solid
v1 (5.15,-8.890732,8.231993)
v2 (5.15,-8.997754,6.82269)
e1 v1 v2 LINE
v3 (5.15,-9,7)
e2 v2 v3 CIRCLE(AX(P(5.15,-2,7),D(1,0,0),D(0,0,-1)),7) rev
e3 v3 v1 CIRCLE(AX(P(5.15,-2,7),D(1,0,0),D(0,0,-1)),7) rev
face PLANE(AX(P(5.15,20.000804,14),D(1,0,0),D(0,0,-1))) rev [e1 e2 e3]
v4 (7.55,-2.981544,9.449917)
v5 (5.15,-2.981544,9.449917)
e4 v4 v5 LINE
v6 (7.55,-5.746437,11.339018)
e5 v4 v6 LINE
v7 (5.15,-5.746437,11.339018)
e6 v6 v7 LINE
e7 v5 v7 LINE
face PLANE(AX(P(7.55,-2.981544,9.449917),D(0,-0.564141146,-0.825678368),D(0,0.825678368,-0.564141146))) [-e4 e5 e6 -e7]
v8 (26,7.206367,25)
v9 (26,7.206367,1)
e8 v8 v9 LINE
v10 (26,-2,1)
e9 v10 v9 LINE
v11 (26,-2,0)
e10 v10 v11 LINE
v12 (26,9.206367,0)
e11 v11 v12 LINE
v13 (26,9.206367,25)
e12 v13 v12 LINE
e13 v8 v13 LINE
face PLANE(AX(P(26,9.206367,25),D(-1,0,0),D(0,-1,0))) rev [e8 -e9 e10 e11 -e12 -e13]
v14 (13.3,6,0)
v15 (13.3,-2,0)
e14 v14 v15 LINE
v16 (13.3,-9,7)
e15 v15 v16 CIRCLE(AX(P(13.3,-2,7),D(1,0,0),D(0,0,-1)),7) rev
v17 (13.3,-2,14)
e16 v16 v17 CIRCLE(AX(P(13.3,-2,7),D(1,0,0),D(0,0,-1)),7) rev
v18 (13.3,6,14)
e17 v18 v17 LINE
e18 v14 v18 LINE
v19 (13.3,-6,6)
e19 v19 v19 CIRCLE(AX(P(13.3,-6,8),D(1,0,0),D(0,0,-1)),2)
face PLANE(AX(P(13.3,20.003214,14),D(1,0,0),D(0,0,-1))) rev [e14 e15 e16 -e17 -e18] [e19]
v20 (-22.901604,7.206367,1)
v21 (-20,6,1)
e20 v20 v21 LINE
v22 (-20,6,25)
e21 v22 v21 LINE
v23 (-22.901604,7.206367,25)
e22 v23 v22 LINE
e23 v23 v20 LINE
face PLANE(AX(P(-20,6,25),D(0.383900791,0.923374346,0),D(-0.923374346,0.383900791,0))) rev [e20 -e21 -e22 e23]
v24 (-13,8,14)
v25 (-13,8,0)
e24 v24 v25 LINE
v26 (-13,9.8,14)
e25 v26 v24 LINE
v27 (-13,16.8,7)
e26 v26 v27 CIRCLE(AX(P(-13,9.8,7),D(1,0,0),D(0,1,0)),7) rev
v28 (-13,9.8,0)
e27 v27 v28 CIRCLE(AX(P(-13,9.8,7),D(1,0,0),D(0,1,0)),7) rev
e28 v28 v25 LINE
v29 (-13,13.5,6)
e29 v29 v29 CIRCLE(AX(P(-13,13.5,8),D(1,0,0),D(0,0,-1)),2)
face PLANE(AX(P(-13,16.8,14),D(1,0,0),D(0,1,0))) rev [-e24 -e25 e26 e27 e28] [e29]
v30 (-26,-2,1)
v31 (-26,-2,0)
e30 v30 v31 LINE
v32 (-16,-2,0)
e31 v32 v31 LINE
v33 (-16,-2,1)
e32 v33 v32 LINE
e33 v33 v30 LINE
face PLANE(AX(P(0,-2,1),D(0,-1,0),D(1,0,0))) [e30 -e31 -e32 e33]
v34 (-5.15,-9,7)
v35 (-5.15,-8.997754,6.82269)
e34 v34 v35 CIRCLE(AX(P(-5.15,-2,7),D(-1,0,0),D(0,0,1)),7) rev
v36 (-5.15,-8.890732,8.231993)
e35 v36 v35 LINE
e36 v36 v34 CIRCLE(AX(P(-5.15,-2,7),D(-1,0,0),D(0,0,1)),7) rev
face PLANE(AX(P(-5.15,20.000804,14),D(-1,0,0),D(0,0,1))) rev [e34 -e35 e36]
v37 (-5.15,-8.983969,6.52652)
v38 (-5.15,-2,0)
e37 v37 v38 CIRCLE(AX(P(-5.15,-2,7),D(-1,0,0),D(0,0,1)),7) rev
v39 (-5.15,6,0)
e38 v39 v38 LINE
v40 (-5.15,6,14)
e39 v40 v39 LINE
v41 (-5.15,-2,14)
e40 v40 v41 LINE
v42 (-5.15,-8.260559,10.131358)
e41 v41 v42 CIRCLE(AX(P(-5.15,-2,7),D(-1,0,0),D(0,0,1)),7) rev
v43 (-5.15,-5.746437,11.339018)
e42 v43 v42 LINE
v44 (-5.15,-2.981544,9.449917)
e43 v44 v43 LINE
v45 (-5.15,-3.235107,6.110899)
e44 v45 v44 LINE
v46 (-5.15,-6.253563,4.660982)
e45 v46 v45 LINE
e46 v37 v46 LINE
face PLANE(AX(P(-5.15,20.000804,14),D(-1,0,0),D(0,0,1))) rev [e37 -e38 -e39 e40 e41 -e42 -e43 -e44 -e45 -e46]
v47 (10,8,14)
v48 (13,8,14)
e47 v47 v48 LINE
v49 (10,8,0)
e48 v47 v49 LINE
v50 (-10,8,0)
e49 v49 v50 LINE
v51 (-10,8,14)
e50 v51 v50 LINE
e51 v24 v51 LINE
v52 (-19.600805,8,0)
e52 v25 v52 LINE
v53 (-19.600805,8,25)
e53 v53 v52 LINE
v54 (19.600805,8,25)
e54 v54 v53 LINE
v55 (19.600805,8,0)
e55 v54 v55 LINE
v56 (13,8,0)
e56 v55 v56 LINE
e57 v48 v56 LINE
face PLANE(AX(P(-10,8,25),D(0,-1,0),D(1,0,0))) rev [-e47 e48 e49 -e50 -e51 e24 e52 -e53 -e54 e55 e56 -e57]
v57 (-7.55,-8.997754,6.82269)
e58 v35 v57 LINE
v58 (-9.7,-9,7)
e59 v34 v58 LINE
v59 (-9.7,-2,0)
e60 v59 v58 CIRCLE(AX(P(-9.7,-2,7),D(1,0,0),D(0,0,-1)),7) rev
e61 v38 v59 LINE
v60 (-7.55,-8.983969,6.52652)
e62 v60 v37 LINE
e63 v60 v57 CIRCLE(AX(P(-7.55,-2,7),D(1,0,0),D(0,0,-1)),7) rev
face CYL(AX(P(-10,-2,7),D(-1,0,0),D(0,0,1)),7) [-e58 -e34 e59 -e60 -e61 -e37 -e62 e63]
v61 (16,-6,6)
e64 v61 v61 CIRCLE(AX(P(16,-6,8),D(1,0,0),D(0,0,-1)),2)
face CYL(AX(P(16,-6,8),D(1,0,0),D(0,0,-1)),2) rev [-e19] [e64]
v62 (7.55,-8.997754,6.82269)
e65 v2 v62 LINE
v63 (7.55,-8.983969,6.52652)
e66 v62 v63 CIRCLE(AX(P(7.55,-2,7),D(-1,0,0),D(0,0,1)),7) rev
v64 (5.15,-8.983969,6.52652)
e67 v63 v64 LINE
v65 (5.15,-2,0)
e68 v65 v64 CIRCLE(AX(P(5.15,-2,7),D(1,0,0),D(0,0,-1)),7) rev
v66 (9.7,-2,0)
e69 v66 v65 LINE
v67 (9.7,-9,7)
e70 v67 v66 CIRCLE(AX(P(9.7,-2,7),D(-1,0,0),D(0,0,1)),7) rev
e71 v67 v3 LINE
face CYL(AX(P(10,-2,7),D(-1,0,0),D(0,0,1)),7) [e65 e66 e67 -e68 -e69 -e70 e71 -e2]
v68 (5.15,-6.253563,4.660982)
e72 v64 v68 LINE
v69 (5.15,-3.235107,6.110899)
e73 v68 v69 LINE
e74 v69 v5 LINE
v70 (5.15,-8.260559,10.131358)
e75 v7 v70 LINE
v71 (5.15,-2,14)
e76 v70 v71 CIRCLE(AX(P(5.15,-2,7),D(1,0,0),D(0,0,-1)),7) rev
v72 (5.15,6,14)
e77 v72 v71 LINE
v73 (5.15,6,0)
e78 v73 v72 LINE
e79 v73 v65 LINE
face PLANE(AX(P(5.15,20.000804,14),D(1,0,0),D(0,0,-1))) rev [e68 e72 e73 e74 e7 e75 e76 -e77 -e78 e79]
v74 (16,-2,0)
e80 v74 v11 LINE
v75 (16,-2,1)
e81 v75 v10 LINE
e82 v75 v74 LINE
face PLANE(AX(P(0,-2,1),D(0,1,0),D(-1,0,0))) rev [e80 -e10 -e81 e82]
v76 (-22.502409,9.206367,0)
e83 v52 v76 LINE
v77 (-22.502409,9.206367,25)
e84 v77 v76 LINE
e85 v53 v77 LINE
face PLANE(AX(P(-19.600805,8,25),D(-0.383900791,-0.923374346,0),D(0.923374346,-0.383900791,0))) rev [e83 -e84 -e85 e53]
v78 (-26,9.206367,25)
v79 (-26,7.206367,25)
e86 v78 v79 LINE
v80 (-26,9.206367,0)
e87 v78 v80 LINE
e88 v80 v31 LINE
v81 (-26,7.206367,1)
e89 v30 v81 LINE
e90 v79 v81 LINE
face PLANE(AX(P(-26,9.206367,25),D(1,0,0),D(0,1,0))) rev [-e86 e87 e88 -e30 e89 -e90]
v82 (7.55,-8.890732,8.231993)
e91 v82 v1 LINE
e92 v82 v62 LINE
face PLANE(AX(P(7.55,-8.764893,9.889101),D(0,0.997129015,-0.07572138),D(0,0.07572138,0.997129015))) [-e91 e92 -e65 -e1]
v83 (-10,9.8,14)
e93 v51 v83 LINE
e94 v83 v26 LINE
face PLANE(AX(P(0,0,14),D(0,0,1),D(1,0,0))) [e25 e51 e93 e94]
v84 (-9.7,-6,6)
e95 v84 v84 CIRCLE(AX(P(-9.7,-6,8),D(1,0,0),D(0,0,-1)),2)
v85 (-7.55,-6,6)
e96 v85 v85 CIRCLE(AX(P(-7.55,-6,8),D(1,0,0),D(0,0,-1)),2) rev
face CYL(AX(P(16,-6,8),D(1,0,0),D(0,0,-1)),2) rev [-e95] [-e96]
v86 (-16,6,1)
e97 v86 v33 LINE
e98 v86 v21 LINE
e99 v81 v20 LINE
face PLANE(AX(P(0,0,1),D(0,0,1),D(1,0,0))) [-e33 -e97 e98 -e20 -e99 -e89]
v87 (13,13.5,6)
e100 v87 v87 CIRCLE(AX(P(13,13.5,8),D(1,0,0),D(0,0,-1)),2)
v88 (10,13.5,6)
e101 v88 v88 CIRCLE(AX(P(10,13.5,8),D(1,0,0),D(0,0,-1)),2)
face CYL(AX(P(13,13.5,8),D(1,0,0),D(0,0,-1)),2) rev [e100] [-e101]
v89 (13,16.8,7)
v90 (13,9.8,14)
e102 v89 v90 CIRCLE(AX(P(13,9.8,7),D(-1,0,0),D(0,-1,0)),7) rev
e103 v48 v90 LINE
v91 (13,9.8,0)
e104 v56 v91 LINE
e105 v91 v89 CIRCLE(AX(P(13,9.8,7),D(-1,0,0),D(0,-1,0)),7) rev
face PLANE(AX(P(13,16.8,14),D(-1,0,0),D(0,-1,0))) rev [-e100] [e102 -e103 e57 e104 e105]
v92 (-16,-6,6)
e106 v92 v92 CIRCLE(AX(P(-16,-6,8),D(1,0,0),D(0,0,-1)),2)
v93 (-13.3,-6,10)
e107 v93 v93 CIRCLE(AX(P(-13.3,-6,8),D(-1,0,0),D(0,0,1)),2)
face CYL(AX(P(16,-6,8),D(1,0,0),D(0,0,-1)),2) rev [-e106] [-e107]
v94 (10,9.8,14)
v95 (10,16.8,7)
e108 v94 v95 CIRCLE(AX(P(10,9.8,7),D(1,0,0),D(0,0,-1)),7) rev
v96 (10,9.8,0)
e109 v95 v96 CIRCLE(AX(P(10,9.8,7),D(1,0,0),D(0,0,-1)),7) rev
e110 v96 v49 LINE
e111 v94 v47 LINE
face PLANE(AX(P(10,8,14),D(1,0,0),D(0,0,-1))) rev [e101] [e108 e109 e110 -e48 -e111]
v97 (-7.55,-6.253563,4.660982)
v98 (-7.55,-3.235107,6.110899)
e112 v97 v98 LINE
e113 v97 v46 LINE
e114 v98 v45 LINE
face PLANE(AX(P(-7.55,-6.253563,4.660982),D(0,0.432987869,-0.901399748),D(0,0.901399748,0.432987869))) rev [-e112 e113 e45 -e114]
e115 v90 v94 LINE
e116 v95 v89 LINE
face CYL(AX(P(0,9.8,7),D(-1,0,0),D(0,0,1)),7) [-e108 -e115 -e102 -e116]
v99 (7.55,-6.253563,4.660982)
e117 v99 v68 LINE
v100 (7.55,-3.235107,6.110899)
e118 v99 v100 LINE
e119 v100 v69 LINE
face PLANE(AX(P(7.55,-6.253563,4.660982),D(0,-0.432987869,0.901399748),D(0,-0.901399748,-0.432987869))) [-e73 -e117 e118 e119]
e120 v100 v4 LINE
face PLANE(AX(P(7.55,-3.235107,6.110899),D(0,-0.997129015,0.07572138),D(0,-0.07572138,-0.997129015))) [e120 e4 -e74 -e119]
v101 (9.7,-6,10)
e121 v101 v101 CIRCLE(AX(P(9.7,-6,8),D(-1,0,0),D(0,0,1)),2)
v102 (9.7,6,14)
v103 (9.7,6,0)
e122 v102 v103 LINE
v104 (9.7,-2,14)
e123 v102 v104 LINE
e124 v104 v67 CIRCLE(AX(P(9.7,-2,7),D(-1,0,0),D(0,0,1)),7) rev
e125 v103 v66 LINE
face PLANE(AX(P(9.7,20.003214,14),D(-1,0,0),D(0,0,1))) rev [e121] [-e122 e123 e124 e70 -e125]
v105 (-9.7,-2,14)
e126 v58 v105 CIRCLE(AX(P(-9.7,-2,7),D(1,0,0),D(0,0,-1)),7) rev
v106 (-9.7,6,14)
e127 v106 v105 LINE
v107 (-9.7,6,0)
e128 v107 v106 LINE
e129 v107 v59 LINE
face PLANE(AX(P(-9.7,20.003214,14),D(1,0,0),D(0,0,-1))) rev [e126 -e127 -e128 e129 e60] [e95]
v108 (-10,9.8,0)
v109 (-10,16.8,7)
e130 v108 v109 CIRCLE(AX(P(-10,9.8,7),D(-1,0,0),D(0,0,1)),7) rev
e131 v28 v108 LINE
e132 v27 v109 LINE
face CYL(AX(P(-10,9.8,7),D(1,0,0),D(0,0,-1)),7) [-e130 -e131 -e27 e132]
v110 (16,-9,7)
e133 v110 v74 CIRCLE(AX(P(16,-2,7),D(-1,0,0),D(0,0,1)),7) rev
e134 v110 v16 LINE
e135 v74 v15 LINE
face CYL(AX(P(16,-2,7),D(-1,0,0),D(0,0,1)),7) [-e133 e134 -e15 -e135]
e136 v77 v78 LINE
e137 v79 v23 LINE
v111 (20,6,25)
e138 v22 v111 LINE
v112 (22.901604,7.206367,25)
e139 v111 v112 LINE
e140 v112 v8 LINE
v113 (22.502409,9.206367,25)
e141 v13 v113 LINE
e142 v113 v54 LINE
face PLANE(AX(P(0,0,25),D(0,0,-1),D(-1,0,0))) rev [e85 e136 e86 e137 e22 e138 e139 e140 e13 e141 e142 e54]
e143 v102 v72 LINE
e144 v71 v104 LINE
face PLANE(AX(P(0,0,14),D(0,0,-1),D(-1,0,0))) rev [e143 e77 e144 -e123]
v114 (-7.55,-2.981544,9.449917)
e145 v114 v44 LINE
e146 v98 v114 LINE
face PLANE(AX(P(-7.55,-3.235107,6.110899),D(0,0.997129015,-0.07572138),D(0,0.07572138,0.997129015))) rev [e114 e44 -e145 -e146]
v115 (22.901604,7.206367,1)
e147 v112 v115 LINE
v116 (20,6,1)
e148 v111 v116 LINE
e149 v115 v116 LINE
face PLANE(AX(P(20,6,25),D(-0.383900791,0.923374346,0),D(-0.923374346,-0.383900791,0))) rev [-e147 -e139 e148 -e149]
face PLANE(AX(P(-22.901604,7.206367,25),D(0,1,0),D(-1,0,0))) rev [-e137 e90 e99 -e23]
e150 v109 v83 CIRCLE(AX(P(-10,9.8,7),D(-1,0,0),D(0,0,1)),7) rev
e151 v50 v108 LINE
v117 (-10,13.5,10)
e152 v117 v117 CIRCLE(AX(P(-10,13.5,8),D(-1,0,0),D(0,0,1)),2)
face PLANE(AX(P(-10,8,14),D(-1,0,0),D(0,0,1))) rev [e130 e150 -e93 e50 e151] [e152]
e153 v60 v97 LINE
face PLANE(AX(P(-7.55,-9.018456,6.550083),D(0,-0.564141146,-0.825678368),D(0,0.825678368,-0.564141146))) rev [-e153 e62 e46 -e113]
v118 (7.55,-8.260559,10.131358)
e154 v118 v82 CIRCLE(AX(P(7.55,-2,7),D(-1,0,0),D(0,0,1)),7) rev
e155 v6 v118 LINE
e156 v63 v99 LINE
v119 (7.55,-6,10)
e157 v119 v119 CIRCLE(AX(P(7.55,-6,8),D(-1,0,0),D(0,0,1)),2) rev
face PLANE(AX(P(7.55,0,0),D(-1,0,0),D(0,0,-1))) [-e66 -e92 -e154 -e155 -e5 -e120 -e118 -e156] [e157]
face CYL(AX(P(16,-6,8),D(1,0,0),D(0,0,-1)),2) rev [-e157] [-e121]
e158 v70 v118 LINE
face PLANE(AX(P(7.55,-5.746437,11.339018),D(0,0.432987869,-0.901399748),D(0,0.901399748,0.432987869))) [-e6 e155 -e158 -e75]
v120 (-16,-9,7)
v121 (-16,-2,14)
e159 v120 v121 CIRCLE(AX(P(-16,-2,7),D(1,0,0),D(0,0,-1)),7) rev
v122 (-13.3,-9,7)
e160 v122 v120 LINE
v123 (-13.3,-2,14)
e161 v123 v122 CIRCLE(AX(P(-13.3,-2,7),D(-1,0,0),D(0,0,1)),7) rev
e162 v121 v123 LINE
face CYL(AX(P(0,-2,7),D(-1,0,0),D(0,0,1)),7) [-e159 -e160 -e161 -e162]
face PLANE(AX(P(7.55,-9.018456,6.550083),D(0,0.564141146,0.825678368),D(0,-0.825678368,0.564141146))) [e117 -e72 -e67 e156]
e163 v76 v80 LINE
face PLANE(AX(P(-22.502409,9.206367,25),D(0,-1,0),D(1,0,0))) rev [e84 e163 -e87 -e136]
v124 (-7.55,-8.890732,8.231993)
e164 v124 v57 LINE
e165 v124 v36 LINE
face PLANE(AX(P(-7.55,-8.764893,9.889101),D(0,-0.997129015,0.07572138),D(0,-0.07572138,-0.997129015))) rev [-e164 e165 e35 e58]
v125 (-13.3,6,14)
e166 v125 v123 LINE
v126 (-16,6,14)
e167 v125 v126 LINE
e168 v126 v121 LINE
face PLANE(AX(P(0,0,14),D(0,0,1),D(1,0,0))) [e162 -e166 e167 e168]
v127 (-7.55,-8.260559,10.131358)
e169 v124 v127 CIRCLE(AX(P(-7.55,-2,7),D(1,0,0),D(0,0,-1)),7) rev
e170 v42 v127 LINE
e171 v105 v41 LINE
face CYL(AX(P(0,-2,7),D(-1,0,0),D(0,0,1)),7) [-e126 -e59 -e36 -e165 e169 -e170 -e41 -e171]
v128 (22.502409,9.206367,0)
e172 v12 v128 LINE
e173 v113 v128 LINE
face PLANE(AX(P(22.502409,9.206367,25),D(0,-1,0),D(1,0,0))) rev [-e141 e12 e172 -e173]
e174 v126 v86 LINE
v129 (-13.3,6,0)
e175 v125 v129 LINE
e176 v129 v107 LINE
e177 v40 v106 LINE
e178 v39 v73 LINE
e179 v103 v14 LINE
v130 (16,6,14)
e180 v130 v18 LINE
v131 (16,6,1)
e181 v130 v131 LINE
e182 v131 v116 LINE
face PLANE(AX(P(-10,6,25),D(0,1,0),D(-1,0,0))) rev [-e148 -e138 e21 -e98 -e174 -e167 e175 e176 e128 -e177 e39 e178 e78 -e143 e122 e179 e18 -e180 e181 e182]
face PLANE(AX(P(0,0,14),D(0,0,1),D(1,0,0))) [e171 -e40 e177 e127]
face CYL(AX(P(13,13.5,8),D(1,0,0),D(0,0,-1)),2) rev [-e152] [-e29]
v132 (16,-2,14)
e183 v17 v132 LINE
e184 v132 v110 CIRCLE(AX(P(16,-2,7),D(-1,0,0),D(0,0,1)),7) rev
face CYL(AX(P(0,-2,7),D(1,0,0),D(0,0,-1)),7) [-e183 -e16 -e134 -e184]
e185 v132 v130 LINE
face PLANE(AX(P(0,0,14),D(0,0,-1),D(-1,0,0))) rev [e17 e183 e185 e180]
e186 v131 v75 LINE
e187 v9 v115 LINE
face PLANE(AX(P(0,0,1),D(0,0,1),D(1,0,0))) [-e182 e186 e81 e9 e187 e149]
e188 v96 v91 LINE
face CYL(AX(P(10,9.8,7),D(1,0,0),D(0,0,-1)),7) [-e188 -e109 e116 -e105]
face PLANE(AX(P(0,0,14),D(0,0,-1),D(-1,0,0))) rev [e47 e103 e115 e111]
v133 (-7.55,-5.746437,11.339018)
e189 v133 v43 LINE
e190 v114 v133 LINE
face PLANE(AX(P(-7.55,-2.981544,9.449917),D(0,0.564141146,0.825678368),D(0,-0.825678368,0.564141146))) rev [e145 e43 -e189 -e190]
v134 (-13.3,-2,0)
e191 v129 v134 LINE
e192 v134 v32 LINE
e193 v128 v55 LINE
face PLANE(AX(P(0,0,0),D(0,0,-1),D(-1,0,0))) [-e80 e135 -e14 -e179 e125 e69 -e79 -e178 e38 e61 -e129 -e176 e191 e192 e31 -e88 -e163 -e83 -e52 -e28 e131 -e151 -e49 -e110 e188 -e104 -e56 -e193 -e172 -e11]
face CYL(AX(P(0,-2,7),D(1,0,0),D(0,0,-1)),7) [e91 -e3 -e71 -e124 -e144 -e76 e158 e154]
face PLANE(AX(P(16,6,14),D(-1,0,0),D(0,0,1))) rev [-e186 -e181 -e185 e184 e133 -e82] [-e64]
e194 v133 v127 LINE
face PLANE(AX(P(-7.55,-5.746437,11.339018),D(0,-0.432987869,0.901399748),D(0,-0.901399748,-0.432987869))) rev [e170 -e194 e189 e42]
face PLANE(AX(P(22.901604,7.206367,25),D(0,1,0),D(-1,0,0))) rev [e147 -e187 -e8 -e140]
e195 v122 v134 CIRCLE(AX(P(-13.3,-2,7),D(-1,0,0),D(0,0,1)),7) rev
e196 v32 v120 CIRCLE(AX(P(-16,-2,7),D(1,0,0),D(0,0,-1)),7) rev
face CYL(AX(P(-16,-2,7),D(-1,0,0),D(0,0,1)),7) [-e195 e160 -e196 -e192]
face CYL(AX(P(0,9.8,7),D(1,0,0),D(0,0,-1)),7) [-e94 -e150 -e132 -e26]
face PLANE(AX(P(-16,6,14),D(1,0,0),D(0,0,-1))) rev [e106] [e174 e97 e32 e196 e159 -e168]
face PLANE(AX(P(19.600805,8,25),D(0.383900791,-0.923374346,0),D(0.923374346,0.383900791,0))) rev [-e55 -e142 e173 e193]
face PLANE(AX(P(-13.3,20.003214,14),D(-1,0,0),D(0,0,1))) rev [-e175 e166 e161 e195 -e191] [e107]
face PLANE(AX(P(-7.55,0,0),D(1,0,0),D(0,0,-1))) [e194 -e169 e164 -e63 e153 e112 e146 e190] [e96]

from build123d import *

# Parameters (mm, degrees)
SKETCH2_W                 = 5
SKETCH2_H                 = 15
BOSS_EXTRUDE1_DEPTH       = 14
BOSS_EXTRUDE1_2_DEPTH     = 14
BOSS_EXTRUDE3_DEPTH       = 25
SKETCH5_W                 = 3
SKETCH5_H                 = 8.8
BOSS_EXTRUDE4_DEPTH       = 14
SKETCH7_W                 = 3
SKETCH7_H                 = 15
BOSS_EXTRUDE5_DEPTH       = 14
SKETCH15_W                = 0.3
SKETCH15_H                = 14
CUT_EXTRUDE2_DEPTH        = 15
SKETCH16_W                = 0.15
SKETCH16_H                = 14
CUT_EXTRUDE3_DEPTH        = 15
FILLET1_R                 = 7
F_4_0MM_DOWEL_HOLE2_D     = 4
FILLET2_R                 = 7
F_4_0MM_DOWEL_HOLE1_D     = 4
F_4_0MM_DOWEL_HOLE1_DEPTH = 26
F_4_0MM_DOWEL_HOLE1_TIP   = 1.201721238
BOSS_EXTRUDE6_DEPTH       = 1
CUT_EXTRUDE4_DEPTH        = 2.4


with BuildPart() as part:
    # Sketch2 → Boss-Extrude1 (new body)
    with BuildSketch(Plane.XY):
        with Locations((-7.5, -1.5)):
            Rectangle(SKETCH2_W, SKETCH2_H)
    extrude(amount=BOSS_EXTRUDE1_DEPTH)



with BuildPart() as body_2:
    # Sketch2 → Boss-Extrude1 2 (new body)
    with BuildSketch(Plane.XY):
        with Locations((7.5, -1.5)):
            Rectangle(SKETCH2_W, SKETCH2_H)
    extrude(amount=BOSS_EXTRUDE1_2_DEPTH)


with BuildPart() as part_1:
    add(part.part)

    add(body_2.part)  # Boss-Extrude3 merges body 2
    # Sketch4 → Boss-Extrude3 (add)
    with BuildSketch(Plane.XY):
        Polygon((-10, 6), (-20, 6), (-22.901603942, 7.206366686), (-26, 7.206366686), (-26, 9.206366686), (-22.502408858, 9.206366686), (-19.600804916, 8), (-10, 8), (10, 8), (19.600804916, 8), (22.502408858, 9.206366686), (26, 9.206366686), (26, 7.206366686), (22.901603942, 7.206366686), (20, 6), (10, 6), align=None)
    extrude(amount=BOSS_EXTRUDE3_DEPTH)

    # Sketch5 → Boss-Extrude4 (add)
    with BuildSketch(Plane.XY):
        with Locations((-11.5, 12.4)):
            Rectangle(SKETCH5_W, SKETCH5_H)
        with Locations((11.5, 12.4)):
            Rectangle(SKETCH5_W, SKETCH5_H)
    extrude(amount=BOSS_EXTRUDE4_DEPTH)

    # Sketch7 → Boss-Extrude5 (add)
    with BuildSketch(Plane.XY):
        with Locations((-14.5, -1.5)):
            Rectangle(SKETCH7_W, SKETCH7_H)
        with Locations((14.5, -1.5)):
            Rectangle(SKETCH7_W, SKETCH7_H)
    extrude(amount=BOSS_EXTRUDE5_DEPTH)

    # Sketch15 → Cut-Extrude2 (cut)
    with BuildSketch(Plane.XZ.offset(9)):
        with Locations((-9.85, 7)):
            Rectangle(SKETCH15_W, SKETCH15_H)
        with Locations((9.85, 7)):
            Rectangle(SKETCH15_W, SKETCH15_H)
        with Locations((-13.15, 7)):
            Rectangle(SKETCH15_W, SKETCH15_H)
        with Locations((13.15, 7)):
            Rectangle(SKETCH15_W, SKETCH15_H)
    extrude(amount=-CUT_EXTRUDE2_DEPTH, mode=Mode.SUBTRACT)

    # Sketch16 → Cut-Extrude3 (cut)
    with BuildSketch(Plane.XZ.offset(9)):
        with Locations((-5.075, 7)):
            Rectangle(SKETCH16_W, SKETCH16_H)
        with Locations((5.075, 7)):
            Rectangle(SKETCH16_W, SKETCH16_H)
    extrude(amount=-CUT_EXTRUDE3_DEPTH, mode=Mode.SUBTRACT)

    # Fillet1
    fillet1_edges = [part_1.edges().sort_by_distance(p)[0] for p in [
        (7.425, -9, 0),
        (7.425, -9, 14),
        (-7.425, -9, 0),
        (-7.425, -9, 14),
        (-14.65, -9, 0),
        (-14.65, -9, 14),
        (14.65, -9, 14),
        (14.65, -9, 0),
    ]]
    fillet(fillet1_edges, radius=FILLET1_R - 0.0001)  # a hair under: the kernel refuses the full size

    # Ø4.0mm Dowel Hole2 (through all)
    with Locations(Plane(origin=(16, 0, 0), x_dir=(0, 0, -1), z_dir=(1, 0, 0))):
        with Locations((-8, -6)):
            Hole(F_4_0MM_DOWEL_HOLE2_D / 2)

    # Fillet2
    fillet2_edges = [part_1.edges().sort_by_distance(p)[0] for p in [
        (-11.5, 16.8, 0),
        (-11.5, 16.8, 14),
        (11.5, 16.8, 0),
        (11.5, 16.8, 14),
    ]]
    fillet(fillet2_edges, radius=FILLET2_R - 0.0001)  # a hair under: the kernel refuses the full size

    # Ø4.0mm Dowel Hole1
    with Locations(Plane(origin=(13, 0, 0), x_dir=(0, 0, -1), z_dir=(1, 0, 0))):
        with Locations((-8, 13.5)):
            Hole(F_4_0MM_DOWEL_HOLE1_D / 2, depth=F_4_0MM_DOWEL_HOLE1_DEPTH)
            with Locations((0, 0, -(F_4_0MM_DOWEL_HOLE1_DEPTH + F_4_0MM_DOWEL_HOLE1_TIP / 2))):  # 118° drill point
                Cone(0, F_4_0MM_DOWEL_HOLE1_D / 2, F_4_0MM_DOWEL_HOLE1_TIP, mode=Mode.SUBTRACT)

    # Sketch14 → Boss-Extrude6 (add)
    with BuildSketch(Plane.XY):
        Polygon((-22.901603942, 7.206366686), (-26, 7.206366686), (-26, -2), (-16, -2), (-16, 6), (-20, 6), align=None)
        Polygon((20, 6), (16, 6), (16, -2), (26, -2), (26, 7.206366686), (22.901603942, 7.206366686), align=None)
    extrude(amount=BOSS_EXTRUDE6_DEPTH)

    # Sketch18 → Cut-Extrude4 (cut)
    with BuildSketch(Plane(origin=(-5.15, 0, 0), x_dir=(0, 0, -1), z_dir=(1, 0, 0))):
        Polygon((-6.110899152, -3.235107358), (-9.449916842, -2.981544355), (-11.33901769, -5.746436996), (-9.889100848, -8.764892642), (-6.550083158, -9.018455645), (-4.66098231, -6.253563004), align=None)
    cut_extrude4 = extrude(amount=-CUT_EXTRUDE4_DEPTH, mode=Mode.SUBTRACT)

    # Mirror1: Cut-Extrude4 across plane
    add(cut_extrude4.mirror(Plane(origin=(0, 0, 0), x_dir=(0, 0, 1), z_dir=(1, 0, 0))), mode=Mode.SUBTRACT)


solid = part_1.part
